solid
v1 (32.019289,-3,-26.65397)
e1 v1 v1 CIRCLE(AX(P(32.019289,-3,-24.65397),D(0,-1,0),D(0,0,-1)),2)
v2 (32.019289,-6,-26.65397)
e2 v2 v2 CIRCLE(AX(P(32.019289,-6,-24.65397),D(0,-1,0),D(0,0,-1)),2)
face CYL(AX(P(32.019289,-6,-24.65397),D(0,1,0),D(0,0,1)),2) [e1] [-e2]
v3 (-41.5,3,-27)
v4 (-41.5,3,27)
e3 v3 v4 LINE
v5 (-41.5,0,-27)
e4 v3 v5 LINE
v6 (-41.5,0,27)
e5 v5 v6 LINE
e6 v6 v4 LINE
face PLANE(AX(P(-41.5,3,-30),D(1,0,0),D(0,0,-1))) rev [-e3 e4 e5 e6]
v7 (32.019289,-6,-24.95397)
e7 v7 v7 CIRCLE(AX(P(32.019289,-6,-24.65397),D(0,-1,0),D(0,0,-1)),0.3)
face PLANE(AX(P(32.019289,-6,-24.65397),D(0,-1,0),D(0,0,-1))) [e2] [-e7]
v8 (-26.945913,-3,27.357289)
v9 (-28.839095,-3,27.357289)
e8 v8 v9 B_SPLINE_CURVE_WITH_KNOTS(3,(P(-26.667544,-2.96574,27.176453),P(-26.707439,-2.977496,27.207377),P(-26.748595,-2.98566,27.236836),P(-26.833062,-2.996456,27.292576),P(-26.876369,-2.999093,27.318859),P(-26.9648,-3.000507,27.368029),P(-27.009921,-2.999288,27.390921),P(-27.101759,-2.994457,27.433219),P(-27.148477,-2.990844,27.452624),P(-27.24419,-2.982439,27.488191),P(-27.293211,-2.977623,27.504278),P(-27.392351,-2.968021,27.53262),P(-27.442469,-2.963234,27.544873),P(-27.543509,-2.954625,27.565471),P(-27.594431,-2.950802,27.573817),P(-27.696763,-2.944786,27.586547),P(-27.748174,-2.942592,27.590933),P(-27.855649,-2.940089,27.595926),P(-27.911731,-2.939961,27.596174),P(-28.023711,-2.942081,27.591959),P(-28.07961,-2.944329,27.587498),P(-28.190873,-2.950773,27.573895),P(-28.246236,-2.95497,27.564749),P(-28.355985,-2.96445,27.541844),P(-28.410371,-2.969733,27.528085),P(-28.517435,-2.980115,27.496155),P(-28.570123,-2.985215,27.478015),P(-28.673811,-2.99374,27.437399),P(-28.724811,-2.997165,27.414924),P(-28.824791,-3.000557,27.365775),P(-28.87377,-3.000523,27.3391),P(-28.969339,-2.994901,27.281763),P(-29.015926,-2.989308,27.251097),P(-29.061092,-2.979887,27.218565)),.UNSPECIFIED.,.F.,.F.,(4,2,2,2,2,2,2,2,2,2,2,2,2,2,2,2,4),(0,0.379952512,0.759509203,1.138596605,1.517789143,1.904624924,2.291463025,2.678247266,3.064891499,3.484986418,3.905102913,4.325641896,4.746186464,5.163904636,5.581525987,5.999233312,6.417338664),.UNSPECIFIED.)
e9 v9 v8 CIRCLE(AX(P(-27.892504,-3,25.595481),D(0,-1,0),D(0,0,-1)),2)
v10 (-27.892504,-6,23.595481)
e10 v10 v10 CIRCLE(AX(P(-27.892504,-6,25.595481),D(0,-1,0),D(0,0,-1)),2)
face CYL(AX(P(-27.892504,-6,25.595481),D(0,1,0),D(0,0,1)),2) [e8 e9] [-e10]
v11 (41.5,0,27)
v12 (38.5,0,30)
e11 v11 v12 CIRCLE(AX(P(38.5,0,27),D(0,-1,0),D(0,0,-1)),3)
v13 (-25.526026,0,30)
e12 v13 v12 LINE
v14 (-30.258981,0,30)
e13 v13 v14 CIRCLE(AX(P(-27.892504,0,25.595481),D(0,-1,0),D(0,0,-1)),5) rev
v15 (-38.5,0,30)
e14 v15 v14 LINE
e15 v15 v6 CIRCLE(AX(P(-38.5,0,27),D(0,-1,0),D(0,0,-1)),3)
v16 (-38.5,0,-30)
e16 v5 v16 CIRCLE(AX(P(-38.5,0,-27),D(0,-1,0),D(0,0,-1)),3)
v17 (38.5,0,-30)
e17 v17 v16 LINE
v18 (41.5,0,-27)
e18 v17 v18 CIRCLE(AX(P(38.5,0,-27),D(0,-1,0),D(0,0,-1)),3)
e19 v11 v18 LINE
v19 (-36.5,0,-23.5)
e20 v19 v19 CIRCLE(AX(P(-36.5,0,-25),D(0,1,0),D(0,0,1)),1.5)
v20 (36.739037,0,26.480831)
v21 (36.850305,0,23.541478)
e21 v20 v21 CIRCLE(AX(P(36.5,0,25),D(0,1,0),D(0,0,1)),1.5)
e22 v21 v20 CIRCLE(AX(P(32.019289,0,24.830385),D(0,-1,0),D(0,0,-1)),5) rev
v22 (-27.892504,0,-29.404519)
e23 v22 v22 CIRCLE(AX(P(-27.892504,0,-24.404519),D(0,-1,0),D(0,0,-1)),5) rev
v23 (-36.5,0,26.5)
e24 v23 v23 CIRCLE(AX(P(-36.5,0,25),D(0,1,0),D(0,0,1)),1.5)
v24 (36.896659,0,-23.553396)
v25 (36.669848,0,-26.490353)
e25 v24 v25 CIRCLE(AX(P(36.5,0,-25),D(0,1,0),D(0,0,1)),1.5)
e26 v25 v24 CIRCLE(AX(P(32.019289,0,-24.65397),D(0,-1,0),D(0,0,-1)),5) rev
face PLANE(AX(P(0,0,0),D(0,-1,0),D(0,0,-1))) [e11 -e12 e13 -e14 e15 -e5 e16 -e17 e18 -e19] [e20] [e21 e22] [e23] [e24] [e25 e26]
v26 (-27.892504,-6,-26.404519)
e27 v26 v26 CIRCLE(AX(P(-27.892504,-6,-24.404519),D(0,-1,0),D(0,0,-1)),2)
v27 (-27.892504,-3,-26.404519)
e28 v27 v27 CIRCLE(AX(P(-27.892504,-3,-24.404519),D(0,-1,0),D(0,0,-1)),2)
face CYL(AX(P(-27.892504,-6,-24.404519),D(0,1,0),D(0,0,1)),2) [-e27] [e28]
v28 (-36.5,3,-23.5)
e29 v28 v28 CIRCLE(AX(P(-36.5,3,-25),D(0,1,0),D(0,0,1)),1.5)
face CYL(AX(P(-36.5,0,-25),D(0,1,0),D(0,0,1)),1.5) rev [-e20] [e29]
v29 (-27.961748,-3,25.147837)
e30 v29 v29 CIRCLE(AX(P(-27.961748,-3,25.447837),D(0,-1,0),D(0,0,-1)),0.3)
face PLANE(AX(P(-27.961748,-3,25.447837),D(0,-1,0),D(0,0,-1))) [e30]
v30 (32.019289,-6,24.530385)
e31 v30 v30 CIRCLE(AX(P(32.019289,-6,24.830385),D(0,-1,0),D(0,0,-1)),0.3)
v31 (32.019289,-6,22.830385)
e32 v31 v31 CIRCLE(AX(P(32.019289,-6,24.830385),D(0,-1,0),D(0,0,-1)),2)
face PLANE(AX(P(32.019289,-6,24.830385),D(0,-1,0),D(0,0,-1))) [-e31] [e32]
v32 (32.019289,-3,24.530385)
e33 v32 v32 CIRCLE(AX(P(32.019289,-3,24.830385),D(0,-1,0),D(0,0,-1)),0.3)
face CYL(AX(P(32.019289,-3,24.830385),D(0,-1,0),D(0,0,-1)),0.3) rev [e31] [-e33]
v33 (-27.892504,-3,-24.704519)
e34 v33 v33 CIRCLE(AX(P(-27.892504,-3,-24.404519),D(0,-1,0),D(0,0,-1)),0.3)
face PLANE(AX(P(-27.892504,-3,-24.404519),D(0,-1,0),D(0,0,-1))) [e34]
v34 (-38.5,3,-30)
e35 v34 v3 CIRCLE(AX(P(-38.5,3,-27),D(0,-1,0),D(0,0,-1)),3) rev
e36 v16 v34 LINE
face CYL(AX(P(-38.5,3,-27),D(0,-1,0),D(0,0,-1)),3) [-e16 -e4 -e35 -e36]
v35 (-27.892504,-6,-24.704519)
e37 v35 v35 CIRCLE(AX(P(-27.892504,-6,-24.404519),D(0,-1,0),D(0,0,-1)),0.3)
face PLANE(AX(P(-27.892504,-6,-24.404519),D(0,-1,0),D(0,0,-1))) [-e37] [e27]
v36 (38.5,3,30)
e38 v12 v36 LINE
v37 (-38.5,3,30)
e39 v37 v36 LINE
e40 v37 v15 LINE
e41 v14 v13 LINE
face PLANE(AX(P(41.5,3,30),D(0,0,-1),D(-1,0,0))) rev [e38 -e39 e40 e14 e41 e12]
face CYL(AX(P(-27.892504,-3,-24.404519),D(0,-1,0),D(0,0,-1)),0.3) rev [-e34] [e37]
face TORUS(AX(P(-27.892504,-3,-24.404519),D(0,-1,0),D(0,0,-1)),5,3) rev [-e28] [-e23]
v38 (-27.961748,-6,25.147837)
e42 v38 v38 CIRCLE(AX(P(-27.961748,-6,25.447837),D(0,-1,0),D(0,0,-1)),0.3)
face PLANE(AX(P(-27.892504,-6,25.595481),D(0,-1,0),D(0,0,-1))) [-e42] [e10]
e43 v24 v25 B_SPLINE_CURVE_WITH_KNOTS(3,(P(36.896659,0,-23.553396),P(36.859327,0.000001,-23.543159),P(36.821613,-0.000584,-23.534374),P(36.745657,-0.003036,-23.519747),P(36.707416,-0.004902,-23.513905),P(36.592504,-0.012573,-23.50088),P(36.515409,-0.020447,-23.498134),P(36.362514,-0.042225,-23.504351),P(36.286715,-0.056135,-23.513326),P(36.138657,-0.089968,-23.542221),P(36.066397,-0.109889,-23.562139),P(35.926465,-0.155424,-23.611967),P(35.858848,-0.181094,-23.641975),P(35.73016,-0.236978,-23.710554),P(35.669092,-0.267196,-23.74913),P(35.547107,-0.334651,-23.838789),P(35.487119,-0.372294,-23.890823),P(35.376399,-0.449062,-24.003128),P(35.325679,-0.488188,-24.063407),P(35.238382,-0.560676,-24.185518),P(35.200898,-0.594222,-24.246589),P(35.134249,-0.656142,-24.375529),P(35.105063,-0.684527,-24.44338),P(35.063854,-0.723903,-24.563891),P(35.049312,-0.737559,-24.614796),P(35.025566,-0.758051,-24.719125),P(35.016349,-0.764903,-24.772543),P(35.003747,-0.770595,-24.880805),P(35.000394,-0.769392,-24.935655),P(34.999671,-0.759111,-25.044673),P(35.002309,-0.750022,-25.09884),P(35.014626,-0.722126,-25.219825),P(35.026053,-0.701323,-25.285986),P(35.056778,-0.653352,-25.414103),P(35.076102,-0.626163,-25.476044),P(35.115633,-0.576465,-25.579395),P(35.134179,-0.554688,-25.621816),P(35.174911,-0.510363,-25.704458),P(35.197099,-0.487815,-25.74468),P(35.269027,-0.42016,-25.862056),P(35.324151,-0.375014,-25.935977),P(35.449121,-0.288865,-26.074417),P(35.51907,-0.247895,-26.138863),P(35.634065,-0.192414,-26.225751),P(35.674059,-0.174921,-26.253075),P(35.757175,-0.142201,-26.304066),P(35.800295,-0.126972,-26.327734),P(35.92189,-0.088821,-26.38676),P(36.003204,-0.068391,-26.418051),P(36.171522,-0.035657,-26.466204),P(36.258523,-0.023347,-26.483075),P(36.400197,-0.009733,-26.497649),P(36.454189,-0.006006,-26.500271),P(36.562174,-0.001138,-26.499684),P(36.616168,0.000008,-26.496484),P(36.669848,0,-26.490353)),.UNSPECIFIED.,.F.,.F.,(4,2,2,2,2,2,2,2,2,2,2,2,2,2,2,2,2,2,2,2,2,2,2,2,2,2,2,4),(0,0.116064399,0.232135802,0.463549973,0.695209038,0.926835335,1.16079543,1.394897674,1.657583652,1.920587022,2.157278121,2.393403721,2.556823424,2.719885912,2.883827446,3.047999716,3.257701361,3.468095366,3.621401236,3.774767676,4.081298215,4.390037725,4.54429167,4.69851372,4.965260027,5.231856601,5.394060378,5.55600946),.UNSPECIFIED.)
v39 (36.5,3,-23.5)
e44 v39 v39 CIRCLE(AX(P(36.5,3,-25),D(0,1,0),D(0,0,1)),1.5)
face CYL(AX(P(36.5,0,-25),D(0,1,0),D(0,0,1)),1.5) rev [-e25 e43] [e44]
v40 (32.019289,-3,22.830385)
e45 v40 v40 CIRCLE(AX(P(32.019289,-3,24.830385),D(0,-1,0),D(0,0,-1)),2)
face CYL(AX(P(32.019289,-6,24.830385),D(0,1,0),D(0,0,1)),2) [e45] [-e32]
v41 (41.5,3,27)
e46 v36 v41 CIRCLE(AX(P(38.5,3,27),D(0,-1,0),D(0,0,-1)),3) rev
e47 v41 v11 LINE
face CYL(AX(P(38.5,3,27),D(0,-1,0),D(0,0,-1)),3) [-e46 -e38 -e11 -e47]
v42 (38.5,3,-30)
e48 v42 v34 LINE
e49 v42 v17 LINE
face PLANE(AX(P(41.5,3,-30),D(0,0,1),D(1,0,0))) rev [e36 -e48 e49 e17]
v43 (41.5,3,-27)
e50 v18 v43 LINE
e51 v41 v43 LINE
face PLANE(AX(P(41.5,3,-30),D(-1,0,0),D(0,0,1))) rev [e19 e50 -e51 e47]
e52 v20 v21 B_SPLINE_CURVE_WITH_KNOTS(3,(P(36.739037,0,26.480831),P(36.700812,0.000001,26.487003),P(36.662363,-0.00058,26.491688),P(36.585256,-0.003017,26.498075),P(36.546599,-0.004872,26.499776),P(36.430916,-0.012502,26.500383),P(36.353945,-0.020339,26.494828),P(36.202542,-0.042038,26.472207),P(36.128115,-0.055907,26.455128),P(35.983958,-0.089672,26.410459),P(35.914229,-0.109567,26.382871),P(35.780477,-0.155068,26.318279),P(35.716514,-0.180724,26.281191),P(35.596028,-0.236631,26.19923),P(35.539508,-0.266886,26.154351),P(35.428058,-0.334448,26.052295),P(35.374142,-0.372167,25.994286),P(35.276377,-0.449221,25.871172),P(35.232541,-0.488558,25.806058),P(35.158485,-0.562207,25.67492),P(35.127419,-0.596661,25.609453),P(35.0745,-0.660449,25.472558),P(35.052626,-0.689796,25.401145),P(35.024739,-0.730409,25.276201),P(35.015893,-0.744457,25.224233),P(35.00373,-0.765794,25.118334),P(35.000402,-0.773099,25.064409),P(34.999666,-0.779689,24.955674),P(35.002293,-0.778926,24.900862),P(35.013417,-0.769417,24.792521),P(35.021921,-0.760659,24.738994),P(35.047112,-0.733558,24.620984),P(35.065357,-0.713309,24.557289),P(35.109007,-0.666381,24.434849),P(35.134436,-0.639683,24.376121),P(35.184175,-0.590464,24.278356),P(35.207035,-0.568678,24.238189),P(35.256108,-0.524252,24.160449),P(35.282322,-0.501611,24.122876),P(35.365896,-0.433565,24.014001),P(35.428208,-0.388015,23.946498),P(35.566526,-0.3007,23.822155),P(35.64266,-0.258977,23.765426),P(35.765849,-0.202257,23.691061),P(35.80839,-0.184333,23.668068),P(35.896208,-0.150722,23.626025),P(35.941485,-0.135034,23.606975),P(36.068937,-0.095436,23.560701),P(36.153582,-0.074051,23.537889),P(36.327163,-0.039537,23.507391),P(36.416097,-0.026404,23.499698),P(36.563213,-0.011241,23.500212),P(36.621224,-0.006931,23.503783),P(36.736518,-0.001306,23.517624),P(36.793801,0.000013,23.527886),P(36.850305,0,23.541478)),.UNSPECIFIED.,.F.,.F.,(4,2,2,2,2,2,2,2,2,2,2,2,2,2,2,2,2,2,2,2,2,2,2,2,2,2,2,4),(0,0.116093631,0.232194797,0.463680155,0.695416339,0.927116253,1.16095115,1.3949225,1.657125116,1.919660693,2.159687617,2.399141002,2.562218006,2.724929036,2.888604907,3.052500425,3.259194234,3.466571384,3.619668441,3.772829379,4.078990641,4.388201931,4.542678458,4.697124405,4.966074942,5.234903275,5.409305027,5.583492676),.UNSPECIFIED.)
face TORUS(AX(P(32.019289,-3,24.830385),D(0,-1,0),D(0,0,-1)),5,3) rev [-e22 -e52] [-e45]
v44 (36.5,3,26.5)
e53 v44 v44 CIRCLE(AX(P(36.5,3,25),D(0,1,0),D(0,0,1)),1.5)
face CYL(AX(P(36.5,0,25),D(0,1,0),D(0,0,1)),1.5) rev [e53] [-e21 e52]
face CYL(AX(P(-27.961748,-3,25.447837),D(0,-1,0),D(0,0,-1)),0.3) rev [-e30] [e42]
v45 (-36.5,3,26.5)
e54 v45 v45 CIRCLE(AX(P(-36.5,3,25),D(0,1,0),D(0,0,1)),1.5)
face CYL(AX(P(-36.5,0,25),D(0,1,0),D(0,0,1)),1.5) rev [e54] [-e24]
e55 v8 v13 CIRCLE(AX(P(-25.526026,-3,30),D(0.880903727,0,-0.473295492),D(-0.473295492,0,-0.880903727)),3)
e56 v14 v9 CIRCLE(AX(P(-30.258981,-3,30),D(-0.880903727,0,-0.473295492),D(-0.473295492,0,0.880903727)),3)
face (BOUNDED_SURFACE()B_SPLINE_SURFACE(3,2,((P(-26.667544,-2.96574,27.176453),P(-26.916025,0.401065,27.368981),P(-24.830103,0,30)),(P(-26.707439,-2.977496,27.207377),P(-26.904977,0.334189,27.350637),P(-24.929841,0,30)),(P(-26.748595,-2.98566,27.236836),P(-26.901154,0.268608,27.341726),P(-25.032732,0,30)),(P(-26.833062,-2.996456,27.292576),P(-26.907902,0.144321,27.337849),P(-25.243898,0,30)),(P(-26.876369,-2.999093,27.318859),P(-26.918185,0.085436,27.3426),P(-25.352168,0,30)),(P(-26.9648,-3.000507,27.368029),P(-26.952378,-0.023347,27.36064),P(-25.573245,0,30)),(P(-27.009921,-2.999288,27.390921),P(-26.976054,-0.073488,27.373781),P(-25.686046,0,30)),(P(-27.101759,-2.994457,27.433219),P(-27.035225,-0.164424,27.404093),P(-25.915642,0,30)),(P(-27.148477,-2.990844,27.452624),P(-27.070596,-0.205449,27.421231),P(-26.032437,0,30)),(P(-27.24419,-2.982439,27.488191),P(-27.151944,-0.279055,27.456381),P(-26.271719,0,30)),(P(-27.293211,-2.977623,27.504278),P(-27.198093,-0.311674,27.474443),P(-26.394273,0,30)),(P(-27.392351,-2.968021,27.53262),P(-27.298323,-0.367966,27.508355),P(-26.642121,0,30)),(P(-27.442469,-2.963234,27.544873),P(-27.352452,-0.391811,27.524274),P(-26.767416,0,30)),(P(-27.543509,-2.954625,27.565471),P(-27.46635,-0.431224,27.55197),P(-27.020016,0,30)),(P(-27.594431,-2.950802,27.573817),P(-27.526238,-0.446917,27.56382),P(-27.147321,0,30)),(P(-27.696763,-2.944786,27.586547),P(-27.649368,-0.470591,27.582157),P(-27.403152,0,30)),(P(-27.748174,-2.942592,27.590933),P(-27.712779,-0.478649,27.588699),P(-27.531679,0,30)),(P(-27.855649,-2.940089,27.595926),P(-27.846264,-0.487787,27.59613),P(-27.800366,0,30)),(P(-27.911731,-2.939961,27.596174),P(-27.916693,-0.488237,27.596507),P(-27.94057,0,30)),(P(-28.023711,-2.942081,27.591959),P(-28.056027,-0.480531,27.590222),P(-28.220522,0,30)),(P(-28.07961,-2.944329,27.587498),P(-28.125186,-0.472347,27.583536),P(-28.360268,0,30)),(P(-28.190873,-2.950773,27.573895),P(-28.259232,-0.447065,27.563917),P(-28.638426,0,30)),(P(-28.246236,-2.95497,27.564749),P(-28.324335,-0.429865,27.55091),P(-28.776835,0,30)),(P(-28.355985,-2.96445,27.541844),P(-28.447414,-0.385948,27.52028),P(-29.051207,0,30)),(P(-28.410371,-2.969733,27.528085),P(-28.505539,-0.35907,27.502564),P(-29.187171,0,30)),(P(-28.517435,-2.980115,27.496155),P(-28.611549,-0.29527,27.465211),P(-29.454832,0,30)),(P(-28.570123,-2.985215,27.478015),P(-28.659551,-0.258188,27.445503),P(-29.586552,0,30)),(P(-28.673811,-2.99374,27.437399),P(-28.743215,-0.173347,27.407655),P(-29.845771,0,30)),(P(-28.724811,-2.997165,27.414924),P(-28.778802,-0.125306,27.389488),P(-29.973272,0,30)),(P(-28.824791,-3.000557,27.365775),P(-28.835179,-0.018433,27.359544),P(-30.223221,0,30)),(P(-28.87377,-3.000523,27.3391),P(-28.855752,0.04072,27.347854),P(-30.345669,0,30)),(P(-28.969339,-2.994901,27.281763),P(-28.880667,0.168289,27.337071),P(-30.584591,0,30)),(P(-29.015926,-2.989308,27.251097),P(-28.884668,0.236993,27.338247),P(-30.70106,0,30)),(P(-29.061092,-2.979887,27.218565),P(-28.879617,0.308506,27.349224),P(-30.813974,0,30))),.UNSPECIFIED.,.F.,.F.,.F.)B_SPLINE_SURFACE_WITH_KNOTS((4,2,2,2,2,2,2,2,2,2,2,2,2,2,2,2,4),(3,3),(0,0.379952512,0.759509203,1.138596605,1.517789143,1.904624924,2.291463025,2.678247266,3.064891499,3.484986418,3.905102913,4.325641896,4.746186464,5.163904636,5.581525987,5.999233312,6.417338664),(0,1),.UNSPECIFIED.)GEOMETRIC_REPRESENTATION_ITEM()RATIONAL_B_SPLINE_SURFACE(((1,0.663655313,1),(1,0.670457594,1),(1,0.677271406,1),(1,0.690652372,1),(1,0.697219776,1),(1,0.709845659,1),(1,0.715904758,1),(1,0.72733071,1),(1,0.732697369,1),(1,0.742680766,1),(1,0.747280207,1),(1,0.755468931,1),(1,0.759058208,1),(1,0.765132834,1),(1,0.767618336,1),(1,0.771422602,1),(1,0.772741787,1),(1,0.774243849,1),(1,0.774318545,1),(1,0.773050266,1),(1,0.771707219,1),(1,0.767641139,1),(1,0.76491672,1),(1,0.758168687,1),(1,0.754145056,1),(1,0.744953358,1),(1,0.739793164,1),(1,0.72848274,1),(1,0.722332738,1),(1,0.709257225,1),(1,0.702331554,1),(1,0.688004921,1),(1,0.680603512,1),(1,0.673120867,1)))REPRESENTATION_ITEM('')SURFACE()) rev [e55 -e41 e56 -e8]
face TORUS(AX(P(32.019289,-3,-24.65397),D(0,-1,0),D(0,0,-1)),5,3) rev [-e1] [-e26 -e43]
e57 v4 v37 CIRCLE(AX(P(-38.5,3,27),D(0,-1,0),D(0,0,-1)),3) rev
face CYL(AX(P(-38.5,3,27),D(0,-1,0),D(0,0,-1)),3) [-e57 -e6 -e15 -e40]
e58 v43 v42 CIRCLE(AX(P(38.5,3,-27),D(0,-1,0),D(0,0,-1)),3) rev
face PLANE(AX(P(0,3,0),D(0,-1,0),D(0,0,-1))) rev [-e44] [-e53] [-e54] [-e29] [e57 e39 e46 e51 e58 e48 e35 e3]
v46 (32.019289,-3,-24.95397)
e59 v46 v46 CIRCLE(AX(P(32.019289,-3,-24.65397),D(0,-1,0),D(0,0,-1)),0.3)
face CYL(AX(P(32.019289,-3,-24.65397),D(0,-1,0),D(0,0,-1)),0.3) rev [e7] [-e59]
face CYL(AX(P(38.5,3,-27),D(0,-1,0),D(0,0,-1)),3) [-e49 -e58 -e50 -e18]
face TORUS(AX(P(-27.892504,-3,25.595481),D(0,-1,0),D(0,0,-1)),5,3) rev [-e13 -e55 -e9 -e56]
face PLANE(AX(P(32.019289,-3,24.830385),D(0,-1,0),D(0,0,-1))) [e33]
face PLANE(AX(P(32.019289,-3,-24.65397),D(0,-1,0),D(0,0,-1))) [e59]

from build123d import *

# Parameters (mm, degrees)
SKETCH3_W           = 83
SKETCH3_H           = 60
BOSS_EXTRUDE1_DEPTH = 3
SKETCH4_R           = 1.5
CUT_EXTRUDE1_DEPTH  = 3
FILLET2_R           = 3
FILLET3_R           = 3
SKETCH8_R           = 2
BOSS_EXTRUDE2_DEPTH = 6
FILLET4_R           = 3
SKETCH9_R           = 0.3
CUT_EXTRUDE2_DEPTH  = 3


with BuildPart() as part:
    # Sketch3 → Boss-Extrude1 (new body)
    with BuildSketch(Plane(origin=(0, 0, 0), x_dir=(1, 0, 0), z_dir=(0, 1, 0))):
        Rectangle(SKETCH3_W, SKETCH3_H)
    extrude(amount=BOSS_EXTRUDE1_DEPTH)

    # Sketch4 → Cut-Extrude1 (cut)
    with BuildSketch(Plane(origin=(0, 3, 0), x_dir=(1, 0, 0), z_dir=(0, 1, 0))):
        with Locations(Location((-36.5, 25, 0), (0, 0, 270))):
            Circle(SKETCH4_R)
        with Locations(Location((36.5, 25, 0), (0, 0, 270))):
            Circle(SKETCH4_R)
        with Locations(Location((36.5, -25, 0), (0, 0, 270))):
            Circle(SKETCH4_R)
        with Locations(Location((-36.5, -25, 0), (0, 0, 270))):
            Circle(SKETCH4_R)
    extrude(amount=-CUT_EXTRUDE1_DEPTH, mode=Mode.SUBTRACT)

    # Fillet2
    fillet2_edges = [part.edges().sort_by_distance(p)[0] for p in [
        (-41.5, 1.5, 30),
    ]]
    fillet(fillet2_edges, radius=FILLET2_R)

    # Fillet3
    fillet3_edges = [part.edges().sort_by_distance(p)[0] for p in [
        (-41.5, 1.5, -30),
        (41.5, 1.5, -30),
        (41.5, 1.5, 30),
    ]]
    fillet(fillet3_edges, radius=FILLET3_R)

    # Sketch8 → Boss-Extrude2 (add)
    with BuildSketch(Plane(origin=(0, 0, 0), x_dir=(-1, 0, 0), z_dir=(0, -1, 0))):
        with Locations(Location((27.892503865, -25.595481363, 0), (0, 0, 90))):
            Circle(SKETCH8_R)
        with Locations(Location((-32.019288728, -24.830385061, 0), (0, 0, 90))):
            Circle(SKETCH8_R)
        with Locations(Location((-32.019288728, 24.653970247, 0), (0, 0, 90))):
            Circle(SKETCH8_R)
        with Locations(Location((27.892503865, 24.404518637, 0), (0, 0, 90))):
            Circle(SKETCH8_R)
    extrude(amount=BOSS_EXTRUDE2_DEPTH)

    # Fillet4
    fillet4_edges = [part.edges().sort_by_distance(p)[0] for p in [
        (-27.892503865, 0, -22.404518637),
    ]]
    fillet(fillet4_edges, radius=FILLET4_R)
    fillet4_2_edges = [part.edges().sort_by_distance(p)[0] for p in [
        (-27.892503865, 0, 27.595481363),
    ]]
    fillet(fillet4_2_edges, radius=FILLET4_R)
    # the kernel refuses this fillet: 3 mm, written as the material it adds along each edge
    with BuildSketch(Plane(origin=(32.019288728, 0, 24.830385061), x_dir=(0, 0, -1), z_dir=(-1, 0, 0))) as fillet4_3_piece_1_section:
        with BuildLine():
            CenterArc((2 + FILLET4_R, FILLET4_R), FILLET4_R, 180, 90)
            Line((2, FILLET4_R), (2 - FILLET4_R * 0.02, FILLET4_R))
            Line((2 - FILLET4_R * 0.02, FILLET4_R), (2 - FILLET4_R * 0.02, -FILLET4_R * 0.02))
            Line((2 - FILLET4_R * 0.02, -FILLET4_R * 0.02), (2 + FILLET4_R, -FILLET4_R * 0.02))
            Line((2 + FILLET4_R, -FILLET4_R * 0.02), (2 + FILLET4_R, 0))
        make_face()
    fillet4_3_piece_1 = revolve(axis=Axis((32.019288728, 0, 24.830385061), (0, -1, 0)), mode=Mode.PRIVATE)
    fillet4_3_piece_1 = fillet4_3_piece_1 - Plane(origin=(36.5, -0.855015512, 25), x_dir=(0, 0, 1), z_dir=(0, 1, 0)) * Cylinder(1.5, 21, mode=Mode.PRIVATE)
    add(fillet4_3_piece_1)
    # the kernel refuses this fillet: 3 mm, written as the material it adds along each edge
    with BuildSketch(Plane(origin=(32.019288728, 0, -24.653970247), x_dir=(0, 0, -1), z_dir=(-1, 0, 0))) as fillet4_4_piece_1_section:
        with BuildLine():
            CenterArc((2 + FILLET4_R, FILLET4_R), FILLET4_R, 180, 90)
            Line((2, FILLET4_R), (2 - FILLET4_R * 0.02, FILLET4_R))
            Line((2 - FILLET4_R * 0.02, FILLET4_R), (2 - FILLET4_R * 0.02, -FILLET4_R * 0.02))
            Line((2 - FILLET4_R * 0.02, -FILLET4_R * 0.02), (2 + FILLET4_R, -FILLET4_R * 0.02))
            Line((2 + FILLET4_R, -FILLET4_R * 0.02), (2 + FILLET4_R, 0))
        make_face()
    fillet4_4_piece_1 = revolve(axis=Axis((32.019288728, 0, -24.653970247), (0, -1, 0)), mode=Mode.PRIVATE)
    fillet4_4_piece_1 = fillet4_4_piece_1 - Plane(origin=(36.5, -0.855011953, -25), x_dir=(0, 0, 1), z_dir=(0, 1, 0)) * Cylinder(1.5, 21, mode=Mode.PRIVATE)
    add(fillet4_4_piece_1)

    # Sketch9 → Cut-Extrude2 (cut)
    with BuildSketch(Plane(origin=(0, -6, 0), x_dir=(-1, 0, 0), z_dir=(0, -1, 0))):
        with Locations(Location((27.961748008, -25.447836909, 0), (0, 0, 90))):
            Circle(SKETCH9_R)
        with Locations(Location((-32.019288728, 24.653970247, 0), (0, 0, 90))):
            Circle(SKETCH9_R)
        with Locations(Location((27.892503865, 24.404518637, 0), (0, 0, 90))):
            Circle(SKETCH9_R)
        with Locations(Location((-32.019288728, -24.830385061, 0), (0, 0, 90))):
            Circle(SKETCH9_R)
    extrude(amount=-CUT_EXTRUDE2_DEPTH, mode=Mode.SUBTRACT)


solid = part.part
